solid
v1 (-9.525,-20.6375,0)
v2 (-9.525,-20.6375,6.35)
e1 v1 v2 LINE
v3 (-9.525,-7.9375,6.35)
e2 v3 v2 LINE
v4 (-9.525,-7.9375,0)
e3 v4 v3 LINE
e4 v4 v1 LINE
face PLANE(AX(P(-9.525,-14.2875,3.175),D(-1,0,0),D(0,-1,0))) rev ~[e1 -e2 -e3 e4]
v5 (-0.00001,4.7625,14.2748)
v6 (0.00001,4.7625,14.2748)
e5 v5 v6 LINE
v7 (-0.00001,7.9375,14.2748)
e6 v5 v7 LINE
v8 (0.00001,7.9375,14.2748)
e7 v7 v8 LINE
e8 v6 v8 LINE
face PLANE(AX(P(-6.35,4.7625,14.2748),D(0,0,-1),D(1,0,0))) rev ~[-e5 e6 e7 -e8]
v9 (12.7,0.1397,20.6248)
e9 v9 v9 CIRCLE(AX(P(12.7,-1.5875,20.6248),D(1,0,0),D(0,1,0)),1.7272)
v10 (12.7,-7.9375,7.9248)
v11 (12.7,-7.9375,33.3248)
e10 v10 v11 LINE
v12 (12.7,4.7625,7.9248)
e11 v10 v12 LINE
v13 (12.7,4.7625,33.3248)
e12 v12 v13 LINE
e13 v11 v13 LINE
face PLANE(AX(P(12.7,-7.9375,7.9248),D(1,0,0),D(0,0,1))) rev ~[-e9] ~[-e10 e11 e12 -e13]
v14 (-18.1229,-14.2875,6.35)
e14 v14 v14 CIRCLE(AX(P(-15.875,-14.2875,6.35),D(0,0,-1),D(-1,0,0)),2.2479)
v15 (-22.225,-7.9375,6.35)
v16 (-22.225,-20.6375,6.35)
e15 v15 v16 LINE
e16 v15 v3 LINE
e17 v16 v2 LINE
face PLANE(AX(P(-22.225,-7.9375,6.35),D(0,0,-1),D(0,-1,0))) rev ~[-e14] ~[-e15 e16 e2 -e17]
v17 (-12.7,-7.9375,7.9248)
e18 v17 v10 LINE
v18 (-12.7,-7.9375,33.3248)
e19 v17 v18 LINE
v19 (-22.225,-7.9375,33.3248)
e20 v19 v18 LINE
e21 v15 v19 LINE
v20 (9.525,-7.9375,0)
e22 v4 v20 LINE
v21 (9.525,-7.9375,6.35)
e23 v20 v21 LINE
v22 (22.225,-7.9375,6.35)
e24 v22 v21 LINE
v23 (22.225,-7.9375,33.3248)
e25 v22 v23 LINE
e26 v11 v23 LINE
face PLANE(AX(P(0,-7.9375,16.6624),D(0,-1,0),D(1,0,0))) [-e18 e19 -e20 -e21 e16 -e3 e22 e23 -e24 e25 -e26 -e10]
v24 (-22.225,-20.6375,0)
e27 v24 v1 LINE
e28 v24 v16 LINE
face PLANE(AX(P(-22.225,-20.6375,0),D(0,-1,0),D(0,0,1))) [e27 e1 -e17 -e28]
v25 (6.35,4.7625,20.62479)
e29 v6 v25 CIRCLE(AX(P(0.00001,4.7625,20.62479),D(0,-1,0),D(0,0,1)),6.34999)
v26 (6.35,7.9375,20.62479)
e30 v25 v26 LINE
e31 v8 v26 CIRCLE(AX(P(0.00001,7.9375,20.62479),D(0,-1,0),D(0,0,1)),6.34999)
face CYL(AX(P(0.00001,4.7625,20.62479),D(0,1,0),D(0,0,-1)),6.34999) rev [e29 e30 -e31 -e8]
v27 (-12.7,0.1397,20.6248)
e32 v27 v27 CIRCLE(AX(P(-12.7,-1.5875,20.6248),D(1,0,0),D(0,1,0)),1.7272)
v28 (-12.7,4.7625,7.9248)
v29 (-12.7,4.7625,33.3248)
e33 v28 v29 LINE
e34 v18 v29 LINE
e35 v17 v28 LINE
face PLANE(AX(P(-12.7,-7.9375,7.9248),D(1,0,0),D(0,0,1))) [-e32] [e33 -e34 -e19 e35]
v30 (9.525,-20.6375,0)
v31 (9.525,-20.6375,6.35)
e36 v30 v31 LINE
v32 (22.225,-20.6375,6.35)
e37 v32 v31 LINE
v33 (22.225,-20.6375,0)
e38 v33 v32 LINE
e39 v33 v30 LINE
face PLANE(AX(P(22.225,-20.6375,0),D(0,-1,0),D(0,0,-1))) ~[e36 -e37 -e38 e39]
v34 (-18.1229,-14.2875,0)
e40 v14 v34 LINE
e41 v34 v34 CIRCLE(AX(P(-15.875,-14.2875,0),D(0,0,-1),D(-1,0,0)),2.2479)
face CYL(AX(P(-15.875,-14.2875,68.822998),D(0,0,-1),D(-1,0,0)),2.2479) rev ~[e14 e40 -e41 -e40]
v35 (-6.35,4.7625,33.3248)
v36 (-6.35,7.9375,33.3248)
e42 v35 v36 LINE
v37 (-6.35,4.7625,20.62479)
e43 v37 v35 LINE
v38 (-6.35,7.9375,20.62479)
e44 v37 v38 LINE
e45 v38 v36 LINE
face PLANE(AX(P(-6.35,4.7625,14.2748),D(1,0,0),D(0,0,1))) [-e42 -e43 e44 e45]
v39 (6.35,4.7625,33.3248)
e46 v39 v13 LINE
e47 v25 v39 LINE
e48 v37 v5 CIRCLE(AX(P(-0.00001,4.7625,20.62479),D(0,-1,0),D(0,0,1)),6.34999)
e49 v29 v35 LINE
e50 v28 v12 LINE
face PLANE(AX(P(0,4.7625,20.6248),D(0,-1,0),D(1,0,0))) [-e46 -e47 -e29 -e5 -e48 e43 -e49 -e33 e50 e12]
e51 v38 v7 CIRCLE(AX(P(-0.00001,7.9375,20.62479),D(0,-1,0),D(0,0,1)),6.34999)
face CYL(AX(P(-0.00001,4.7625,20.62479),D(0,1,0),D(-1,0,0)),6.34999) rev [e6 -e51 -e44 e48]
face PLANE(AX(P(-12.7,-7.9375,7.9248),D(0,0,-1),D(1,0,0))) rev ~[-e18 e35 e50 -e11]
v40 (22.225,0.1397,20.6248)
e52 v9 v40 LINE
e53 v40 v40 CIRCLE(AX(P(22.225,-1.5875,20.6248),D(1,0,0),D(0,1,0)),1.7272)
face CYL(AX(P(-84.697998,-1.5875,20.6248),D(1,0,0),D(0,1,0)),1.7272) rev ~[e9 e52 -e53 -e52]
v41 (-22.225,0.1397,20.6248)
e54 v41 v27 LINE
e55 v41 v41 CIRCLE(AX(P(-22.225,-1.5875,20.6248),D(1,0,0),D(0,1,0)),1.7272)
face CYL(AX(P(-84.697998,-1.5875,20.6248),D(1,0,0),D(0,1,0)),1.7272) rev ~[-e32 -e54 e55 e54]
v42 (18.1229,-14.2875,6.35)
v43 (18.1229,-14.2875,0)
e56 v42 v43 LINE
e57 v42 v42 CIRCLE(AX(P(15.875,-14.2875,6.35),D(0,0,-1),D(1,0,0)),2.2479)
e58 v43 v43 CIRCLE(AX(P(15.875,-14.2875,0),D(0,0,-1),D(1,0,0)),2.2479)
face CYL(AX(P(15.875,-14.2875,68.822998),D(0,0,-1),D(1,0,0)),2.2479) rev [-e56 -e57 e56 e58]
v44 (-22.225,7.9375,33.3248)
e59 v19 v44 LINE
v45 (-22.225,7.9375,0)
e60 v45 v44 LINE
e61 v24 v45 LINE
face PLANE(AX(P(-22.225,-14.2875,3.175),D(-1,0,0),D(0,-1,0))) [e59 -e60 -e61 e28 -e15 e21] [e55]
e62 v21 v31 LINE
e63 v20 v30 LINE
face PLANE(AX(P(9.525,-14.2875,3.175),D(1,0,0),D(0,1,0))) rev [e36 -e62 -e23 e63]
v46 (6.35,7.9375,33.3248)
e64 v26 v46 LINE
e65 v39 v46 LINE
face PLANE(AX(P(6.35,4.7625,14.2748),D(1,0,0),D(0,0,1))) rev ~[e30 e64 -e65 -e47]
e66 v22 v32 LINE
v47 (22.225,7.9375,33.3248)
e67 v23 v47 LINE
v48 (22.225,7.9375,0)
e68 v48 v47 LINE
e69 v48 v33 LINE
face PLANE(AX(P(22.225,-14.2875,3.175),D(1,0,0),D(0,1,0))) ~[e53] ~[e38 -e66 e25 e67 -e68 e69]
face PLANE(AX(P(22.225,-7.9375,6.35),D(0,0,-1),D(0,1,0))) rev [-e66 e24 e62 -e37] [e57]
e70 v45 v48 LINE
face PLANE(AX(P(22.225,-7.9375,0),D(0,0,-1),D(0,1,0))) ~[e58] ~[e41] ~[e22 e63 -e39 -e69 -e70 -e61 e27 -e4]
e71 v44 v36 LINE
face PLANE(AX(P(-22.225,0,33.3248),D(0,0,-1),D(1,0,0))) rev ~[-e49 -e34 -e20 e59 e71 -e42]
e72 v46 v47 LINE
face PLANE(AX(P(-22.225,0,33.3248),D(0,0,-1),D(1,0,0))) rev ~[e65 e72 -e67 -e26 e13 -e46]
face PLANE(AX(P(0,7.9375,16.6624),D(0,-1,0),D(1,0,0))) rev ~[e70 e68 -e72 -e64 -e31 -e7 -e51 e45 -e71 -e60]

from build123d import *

# Parameters (mm, degrees)
F0_W     = 44.45
F0_H     = 33.3248
F1_DEPTH = 7.9375
F2_W     = 25.4
F2_H     = 25.4
F3_DEPTH = 12.7
F5_W     = 12.7
F5_H     = 19.05
F6_DEPTH = 3.176
F7_R     = 6.34999
F8_W     = 12.7
F8_H     = 6.35
F9_DEPTH = 12.7
F11_D    = 4.4958
F13_D    = 3.4544


# Not quite as in the source:
# - a fillet or chamfer is up to 0.001 mm smaller than in the source, because OpenCascade refuses the exact size
# - a pattern or mirror of a feature is missing from the dataset's text; its kind, count and spacing are read off the source's solid


with BuildPart() as f1:
    # F0 (on Front) → F1 (new body, symmetric)
    with BuildSketch(Plane.XZ):
        with Locations((0, 16.6624)):
            Rectangle(F0_W, F0_H)
    extrude(amount=F1_DEPTH, both=True)

    # F2 (on face) → F3 (cut)
    with BuildSketch(Plane.XZ.offset(7.9375)):
        with Locations((0, 20.6248)):
            Rectangle(F2_W, F2_H)
    extrude(amount=-F3_DEPTH, mode=Mode.SUBTRACT)

    # F5 (on face) → F6 (cut, through all)
    with BuildSketch(Plane.XZ.offset(-4.7625)):
        with Locations((0, 23.7998)):
            Rectangle(F5_W, F5_H)
    extrude(amount=-F6_DEPTH, mode=Mode.SUBTRACT)

    # F7 (radius 6.35 in the source; OpenCascade refuses exactly that, so slightly less here)
    f7_edges = [f1.edges().sort_by_distance(p)[0] for p in [
        (-6.35, 6.35, 14.2748),
        (6.35, 6.35, 14.2748),
    ]]
    fillet(f7_edges, radius=F7_R)

    # F8 (on face) → F9 (join)
    with BuildSketch(Plane(origin=(-22.225, 0, 0), x_dir=(0, -1, 0), z_dir=(-1, 0, 0))):
        with Locations((14.2875, 3.175)):
            Rectangle(F8_W, F8_H)
    f9 = extrude(amount=-F9_DEPTH)

    # F9_copies: F9 across plane
    add(f9.mirror(Plane(origin=(0, 0, 0), x_dir=(0, 0, 1), z_dir=(1, 0, 0))))

    # F11 (through all)
    with Locations(Plane.XY.offset(6.35)):
        with Locations((-15.875, -14.2875)):
            f11 = Hole(F11_D / 2)

    # F11_copies: F11 across plane
    add(f11.mirror(Plane(origin=(0, 0, 0), x_dir=(0, 0, 1), z_dir=(1, 0, 0))), mode=Mode.SUBTRACT)

    # F13 (through all)
    with Locations(Plane(origin=(-22.225, 0, 0), x_dir=(0, -1, 0), z_dir=(-1, 0, 0))):
        with Locations((1.5875, 20.6248)):
            Hole(F13_D / 2)


solid = f1.part
